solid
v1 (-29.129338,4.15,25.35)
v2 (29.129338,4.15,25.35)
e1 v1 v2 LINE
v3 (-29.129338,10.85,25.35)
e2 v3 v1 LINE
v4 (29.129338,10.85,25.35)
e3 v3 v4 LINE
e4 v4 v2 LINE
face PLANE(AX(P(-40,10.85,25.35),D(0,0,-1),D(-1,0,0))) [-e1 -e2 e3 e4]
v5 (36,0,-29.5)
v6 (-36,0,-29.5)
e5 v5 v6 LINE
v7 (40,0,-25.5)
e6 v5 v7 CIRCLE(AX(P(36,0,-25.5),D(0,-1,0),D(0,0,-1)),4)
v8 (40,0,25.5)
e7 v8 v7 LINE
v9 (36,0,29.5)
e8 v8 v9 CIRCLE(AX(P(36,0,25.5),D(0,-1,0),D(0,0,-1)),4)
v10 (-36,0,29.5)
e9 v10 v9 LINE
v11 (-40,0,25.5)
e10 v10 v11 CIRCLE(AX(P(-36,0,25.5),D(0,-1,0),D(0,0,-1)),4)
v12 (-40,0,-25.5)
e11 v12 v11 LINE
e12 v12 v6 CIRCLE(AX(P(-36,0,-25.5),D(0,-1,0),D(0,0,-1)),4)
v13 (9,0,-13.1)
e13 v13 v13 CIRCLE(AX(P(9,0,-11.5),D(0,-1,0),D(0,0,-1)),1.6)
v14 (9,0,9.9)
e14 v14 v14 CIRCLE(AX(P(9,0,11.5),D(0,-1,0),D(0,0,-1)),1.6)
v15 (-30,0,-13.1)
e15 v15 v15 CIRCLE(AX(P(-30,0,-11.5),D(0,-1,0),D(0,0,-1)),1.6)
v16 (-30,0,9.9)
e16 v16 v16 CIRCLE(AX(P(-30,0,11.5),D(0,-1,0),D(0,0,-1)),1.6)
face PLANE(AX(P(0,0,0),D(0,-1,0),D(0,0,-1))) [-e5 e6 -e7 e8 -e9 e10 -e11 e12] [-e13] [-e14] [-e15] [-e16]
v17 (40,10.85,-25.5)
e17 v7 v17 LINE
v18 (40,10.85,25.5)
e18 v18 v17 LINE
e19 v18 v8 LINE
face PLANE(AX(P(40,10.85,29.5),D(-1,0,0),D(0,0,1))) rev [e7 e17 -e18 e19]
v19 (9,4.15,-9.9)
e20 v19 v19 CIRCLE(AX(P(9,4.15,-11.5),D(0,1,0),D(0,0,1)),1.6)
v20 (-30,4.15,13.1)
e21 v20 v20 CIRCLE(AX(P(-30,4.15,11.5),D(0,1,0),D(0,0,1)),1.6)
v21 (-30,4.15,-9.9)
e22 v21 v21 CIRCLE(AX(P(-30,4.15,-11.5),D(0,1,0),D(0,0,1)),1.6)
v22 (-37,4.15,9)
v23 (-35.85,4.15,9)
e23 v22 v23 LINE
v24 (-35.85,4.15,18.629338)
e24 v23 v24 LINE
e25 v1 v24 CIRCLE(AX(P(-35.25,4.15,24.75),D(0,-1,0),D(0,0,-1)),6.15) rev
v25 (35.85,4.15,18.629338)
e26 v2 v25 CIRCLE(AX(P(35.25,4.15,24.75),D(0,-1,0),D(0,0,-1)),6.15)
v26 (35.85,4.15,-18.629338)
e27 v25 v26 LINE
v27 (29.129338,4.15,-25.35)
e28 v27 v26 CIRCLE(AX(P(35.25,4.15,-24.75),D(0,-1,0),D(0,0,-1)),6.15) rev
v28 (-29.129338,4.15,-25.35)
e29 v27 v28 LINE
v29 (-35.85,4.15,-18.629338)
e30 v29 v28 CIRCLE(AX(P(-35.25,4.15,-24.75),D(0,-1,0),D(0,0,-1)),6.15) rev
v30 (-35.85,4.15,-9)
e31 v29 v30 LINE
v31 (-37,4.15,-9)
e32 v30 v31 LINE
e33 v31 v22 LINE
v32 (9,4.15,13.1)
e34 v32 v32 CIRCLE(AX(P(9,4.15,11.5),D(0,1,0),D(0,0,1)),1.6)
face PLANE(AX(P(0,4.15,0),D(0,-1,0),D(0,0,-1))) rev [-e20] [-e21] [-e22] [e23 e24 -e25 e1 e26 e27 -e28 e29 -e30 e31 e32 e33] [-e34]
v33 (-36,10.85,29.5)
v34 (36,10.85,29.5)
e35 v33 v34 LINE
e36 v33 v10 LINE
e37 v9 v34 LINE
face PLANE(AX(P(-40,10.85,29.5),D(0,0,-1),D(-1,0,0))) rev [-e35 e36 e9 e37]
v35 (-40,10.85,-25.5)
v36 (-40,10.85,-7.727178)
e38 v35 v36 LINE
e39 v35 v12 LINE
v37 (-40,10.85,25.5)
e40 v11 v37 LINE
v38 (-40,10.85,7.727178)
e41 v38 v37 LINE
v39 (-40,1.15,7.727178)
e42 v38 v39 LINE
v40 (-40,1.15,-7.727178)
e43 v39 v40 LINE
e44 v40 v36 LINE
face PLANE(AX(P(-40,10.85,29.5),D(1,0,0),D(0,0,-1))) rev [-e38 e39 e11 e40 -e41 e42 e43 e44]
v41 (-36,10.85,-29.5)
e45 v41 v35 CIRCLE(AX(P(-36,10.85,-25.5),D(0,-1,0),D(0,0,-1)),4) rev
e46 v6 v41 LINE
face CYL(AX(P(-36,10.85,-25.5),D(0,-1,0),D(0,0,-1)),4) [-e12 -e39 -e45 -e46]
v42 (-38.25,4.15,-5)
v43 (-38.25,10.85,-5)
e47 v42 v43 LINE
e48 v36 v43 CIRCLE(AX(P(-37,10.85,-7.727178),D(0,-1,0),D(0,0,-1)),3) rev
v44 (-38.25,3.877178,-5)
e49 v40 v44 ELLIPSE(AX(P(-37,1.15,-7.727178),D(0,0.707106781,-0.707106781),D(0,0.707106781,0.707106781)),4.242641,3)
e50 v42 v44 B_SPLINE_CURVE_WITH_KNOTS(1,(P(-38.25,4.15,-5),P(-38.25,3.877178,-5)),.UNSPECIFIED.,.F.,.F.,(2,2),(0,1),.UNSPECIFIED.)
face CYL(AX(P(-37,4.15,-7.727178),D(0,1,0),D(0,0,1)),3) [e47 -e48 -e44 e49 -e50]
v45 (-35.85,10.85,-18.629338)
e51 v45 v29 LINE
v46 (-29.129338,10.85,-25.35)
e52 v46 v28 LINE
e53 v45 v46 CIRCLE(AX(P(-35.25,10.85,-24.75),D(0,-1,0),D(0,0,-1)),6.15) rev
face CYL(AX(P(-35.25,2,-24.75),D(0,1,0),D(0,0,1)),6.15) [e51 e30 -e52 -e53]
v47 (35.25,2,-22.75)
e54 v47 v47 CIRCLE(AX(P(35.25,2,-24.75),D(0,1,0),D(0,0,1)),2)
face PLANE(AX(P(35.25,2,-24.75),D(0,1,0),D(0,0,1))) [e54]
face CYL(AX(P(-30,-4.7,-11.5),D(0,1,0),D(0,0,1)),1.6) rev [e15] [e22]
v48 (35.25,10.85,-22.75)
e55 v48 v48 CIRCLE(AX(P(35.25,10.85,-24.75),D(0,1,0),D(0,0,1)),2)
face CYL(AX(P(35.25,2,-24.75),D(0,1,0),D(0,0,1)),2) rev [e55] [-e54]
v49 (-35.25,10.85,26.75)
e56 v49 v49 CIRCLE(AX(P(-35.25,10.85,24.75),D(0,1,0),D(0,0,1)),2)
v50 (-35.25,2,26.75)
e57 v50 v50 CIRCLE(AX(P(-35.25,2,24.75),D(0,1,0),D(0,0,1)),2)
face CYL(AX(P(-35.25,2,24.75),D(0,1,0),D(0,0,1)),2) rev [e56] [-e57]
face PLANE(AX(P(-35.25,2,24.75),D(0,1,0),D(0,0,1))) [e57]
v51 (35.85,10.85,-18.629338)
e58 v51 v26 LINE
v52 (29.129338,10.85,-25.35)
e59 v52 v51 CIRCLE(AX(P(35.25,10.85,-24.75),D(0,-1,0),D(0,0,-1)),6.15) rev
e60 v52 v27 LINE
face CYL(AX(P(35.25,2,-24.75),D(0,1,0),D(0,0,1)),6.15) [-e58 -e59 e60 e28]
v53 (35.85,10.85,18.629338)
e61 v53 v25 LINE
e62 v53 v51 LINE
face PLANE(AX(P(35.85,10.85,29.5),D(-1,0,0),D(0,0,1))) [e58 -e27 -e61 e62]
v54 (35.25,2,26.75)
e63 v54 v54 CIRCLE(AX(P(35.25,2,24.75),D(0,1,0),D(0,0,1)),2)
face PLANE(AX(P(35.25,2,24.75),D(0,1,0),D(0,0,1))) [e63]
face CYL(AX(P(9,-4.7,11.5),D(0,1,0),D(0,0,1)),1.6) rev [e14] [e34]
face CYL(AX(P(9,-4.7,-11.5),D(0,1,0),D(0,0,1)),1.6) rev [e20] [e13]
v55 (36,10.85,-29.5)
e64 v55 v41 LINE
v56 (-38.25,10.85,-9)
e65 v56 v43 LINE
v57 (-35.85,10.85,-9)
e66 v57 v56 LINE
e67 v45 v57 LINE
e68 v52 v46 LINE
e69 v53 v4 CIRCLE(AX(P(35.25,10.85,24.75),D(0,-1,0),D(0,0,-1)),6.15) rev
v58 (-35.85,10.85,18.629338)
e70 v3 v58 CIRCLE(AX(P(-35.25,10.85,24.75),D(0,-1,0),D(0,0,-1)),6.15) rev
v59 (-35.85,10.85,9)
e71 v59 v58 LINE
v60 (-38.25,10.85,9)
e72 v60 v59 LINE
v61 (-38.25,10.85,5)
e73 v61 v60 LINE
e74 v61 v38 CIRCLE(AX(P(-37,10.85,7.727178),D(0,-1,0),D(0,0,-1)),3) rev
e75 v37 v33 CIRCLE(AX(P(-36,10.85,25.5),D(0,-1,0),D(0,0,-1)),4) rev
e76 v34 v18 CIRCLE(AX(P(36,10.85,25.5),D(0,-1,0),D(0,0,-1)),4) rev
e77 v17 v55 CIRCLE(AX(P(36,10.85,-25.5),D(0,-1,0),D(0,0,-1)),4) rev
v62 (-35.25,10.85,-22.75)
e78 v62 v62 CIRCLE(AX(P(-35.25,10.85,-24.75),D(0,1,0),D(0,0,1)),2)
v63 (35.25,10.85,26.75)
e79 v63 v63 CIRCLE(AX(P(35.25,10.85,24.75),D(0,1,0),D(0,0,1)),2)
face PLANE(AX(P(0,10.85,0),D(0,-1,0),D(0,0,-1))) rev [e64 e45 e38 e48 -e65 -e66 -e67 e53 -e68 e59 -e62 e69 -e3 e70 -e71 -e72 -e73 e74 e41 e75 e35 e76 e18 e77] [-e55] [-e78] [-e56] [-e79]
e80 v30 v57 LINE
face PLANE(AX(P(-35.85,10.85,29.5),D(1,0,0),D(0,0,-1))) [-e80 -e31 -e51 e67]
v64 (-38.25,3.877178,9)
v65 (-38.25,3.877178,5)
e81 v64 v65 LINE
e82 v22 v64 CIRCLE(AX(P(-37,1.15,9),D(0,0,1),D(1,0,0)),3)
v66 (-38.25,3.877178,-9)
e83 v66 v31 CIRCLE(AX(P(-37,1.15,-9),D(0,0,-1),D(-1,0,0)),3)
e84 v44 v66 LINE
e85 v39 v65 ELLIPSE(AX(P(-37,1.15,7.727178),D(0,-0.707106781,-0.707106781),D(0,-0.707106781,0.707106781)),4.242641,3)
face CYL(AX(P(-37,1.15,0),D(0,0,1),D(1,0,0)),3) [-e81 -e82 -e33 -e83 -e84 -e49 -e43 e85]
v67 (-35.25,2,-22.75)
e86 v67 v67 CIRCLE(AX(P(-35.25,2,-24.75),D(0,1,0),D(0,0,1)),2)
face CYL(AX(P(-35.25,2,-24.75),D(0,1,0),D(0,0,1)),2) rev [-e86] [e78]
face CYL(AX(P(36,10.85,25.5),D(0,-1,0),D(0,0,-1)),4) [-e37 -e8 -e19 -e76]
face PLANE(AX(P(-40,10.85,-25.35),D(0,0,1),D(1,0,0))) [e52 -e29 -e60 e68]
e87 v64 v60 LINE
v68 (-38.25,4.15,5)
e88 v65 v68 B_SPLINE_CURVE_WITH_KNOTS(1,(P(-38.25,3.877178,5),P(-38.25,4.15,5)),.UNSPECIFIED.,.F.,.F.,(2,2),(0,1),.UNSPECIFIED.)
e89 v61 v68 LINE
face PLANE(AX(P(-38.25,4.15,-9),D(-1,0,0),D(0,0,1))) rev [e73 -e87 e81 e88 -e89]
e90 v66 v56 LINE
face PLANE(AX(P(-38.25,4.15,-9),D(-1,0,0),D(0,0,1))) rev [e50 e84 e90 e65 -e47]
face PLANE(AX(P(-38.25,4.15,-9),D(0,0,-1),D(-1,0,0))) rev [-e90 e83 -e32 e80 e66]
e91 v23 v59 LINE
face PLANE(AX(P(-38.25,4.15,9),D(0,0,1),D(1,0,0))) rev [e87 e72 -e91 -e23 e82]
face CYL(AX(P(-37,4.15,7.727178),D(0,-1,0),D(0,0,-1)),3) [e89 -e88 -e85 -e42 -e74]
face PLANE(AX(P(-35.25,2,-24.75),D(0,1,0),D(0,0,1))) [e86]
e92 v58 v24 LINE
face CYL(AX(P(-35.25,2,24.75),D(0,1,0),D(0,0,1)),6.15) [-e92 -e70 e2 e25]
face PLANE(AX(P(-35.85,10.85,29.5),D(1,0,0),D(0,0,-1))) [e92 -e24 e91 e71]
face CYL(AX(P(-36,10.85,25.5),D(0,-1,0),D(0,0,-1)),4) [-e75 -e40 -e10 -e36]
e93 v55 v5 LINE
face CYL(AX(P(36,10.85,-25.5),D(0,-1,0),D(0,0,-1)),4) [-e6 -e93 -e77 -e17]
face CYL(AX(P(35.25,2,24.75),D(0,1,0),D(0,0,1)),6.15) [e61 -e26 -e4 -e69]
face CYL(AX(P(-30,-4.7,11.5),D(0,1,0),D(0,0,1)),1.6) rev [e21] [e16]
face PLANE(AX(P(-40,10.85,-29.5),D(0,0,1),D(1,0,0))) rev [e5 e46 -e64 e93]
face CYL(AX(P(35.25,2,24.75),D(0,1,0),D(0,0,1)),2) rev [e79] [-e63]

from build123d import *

# Parameters (mm, degrees)
SKETCH1_W           = 80
SKETCH1_H           = 59
BOSS_EXTRUDE1_DEPTH = 10.85
SKETCH2_R           = 2
CUT_EXTRUDE1_DEPTH  = 8.85
SHELL3_START        = 4.15
SHELL3_DEPTH        = 6.7
SKETCH3_R           = 1.6
CUT_EXTRUDE2_DEPTH  = 8.85
SKETCH4_W           = 10
SKETCH4_H           = 6.7
CUT_EXTRUDE3_DEPTH  = 8.85
SKETCH5_W           = 2.4
SKETCH5_H           = 18
CUT_EXTRUDE4_DEPTH  = 6.7
FILLET1_R           = 4
FILLET2_R           = 3


# Read off the part's stored shape, not the designer's step: Shell3
with BuildPart() as part:
    # Sketch1 → Boss-Extrude1 (new body)
    with BuildSketch(Plane(origin=(0, 0, 0), x_dir=(1, 0, 0), z_dir=(0, 1, 0))):
        Rectangle(SKETCH1_W, SKETCH1_H)
    extrude(amount=BOSS_EXTRUDE1_DEPTH)

    # Sketch2 → Cut-Extrude1 (cut)
    with BuildSketch(Plane(origin=(0, 10.85, 0), x_dir=(1, 0, 0), z_dir=(0, 1, 0))):
        with Locations(Location((-35.25, 24.75, 0), (0, 0, 270))):
            Circle(SKETCH2_R)
        with Locations(Location((-35.25, -24.75, 0), (0, 0, 270))):
            Circle(SKETCH2_R)
        with Locations(Location((35.25, 24.75, 0), (0, 0, 270))):
            Circle(SKETCH2_R)
        with Locations(Location((35.25, -24.75, 0), (0, 0, 270))):
            Circle(SKETCH2_R)
    extrude(amount=-CUT_EXTRUDE1_DEPTH, mode=Mode.SUBTRACT)

    # Shell3 outline → Shell3 (cut)
    with BuildSketch(Plane(origin=(0, 0, 0), x_dir=(1, 0, 0), z_dir=(0, 1, 0)).offset(SHELL3_START)):
        with BuildLine():
            ThreePointArc((-35.85, -18.629338271), (-30.901293296, -20.401293296), (-29.129338271, -25.35))
            Line((-29.129338271, -25.35), (29.129338271, -25.35))
            ThreePointArc((29.129338271, -25.35), (30.901293296, -20.401293296), (35.85, -18.629338271))
            Line((35.85, -18.629338271), (35.85, 18.629338271))
            ThreePointArc((35.85, 18.629338271), (30.901293296, 20.401293296), (29.129338271, 25.35))
            Line((29.129338271, 25.35), (-29.129338271, 25.35))
            ThreePointArc((-29.129338271, 25.35), (-30.901293296, 20.401293296), (-35.85, 18.629338271))
            Line((-35.85, 18.629338271), (-35.85, -18.629338271))
        make_face()
    extrude(amount=SHELL3_DEPTH, mode=Mode.SUBTRACT)

    # Sketch3 → Cut-Extrude2 (cut)
    with BuildSketch(Plane(origin=(0, 4.15, 0), x_dir=(1, 0, 0), z_dir=(0, 1, 0))):
        with Locations(Location((-30, -11.5, 0), (0, 0, 270))):
            Circle(SKETCH3_R)
        with Locations(Location((9, -11.5, 0), (0, 0, 270))):
            Circle(SKETCH3_R)
        with Locations(Location((9, 11.5, 0), (0, 0, 270))):
            Circle(SKETCH3_R)
        with Locations(Location((-30, 11.5, 0), (0, 0, 270))):
            Circle(SKETCH3_R)
    extrude(amount=-CUT_EXTRUDE2_DEPTH, mode=Mode.SUBTRACT)

    # Sketch4 → Cut-Extrude3 (cut)
    with BuildSketch(Plane.ZY.offset(40)):
        with Locations((0, 7.5)):
            Rectangle(SKETCH4_W, SKETCH4_H)
    extrude(amount=-CUT_EXTRUDE3_DEPTH, mode=Mode.SUBTRACT)

    # Sketch5 → Cut-Extrude4 (cut)
    with BuildSketch(Plane(origin=(0, 10.85, 0), x_dir=(1, 0, 0), z_dir=(0, 1, 0))):
        with Locations((-37.05, 0)):
            Rectangle(SKETCH5_W, SKETCH5_H)
    extrude(amount=-CUT_EXTRUDE4_DEPTH, mode=Mode.SUBTRACT)

    # Fillet1
    fillet1_edges = [part.edges().sort_by_distance(p)[0] for p in [
        (40, 5.425, 29.5),
        (-40, 5.425, 29.5),
        (-40, 5.425, -29.5),
        (40, 5.425, -29.5),
    ]]
    fillet(fillet1_edges, radius=FILLET1_R)

    # Fillet2
    # the kernel refuses this fillet: 3 mm, written as the material it takes off along each edge
    with BuildSketch(Plane(origin=(-40, 17.667945072, -5), x_dir=(0, 0, -1), z_dir=(0, -1, 0)), Plane(origin=(-40, 4.15, 5), x_dir=(0, 0, 1), z_dir=(0, 1, 0))) as fillet2_piece_1:
        with BuildLine():
            CenterArc((2.727178029, 3), FILLET2_R, 204.624318352, 65.375681648)
            Line((0, 1.75), (-0.054543561, 1.725))
            ThreePointArc((-0.054543561, 1.725), (-0.06, 0.875), (-0.06, 0))
            Line((-0.06, 0), (0, -0.06))
            Line((0, -0.06), (2.727178029, -0.06))
            Line((2.727178029, -0.06), (2.727178029, 0))
        make_face()
    extrude(amount=13.517945072, mode=Mode.SUBTRACT)
    with BuildSketch(Plane(origin=(-40, 4.15, -12.5), x_dir=(0, -1, 0), z_dir=(0, 0, 1))) as fillet2_piece_2_section:
        with BuildLine():
            CenterArc((FILLET2_R, FILLET2_R), FILLET2_R, 180, 90)
            Line((0, FILLET2_R), (-FILLET2_R * 0.02, FILLET2_R))
            Line((-FILLET2_R * 0.02, FILLET2_R), (-FILLET2_R * 0.02, -FILLET2_R * 0.02))
            Line((-FILLET2_R * 0.02, -FILLET2_R * 0.02), (FILLET2_R, -FILLET2_R * 0.02))
            Line((FILLET2_R, -FILLET2_R * 0.02), (FILLET2_R, 0))
        make_face()
    fillet2_piece_2 = extrude(amount=17.5, mode=Mode.PRIVATE)
    fillet2_piece_2 = split(fillet2_piece_2, bisect_by=Plane(origin=(-37.813587666, 4.113532684, -5), z_dir=(0, 0, -1)), keep=Keep.TOP, mode=Mode.PRIVATE)
    fillet2_piece_2 = split(fillet2_piece_2, bisect_by=Plane(origin=(-38.25, 4.113532684, -7), z_dir=(1, 0, 0)), keep=Keep.TOP, mode=Mode.PRIVATE)
    fillet2_piece_2 = split(fillet2_piece_2, bisect_by=Plane(origin=(-37.813587666, 4.113532684, -9), z_dir=(0, 0, 1)), keep=Keep.TOP, mode=Mode.PRIVATE)
    add(fillet2_piece_2, mode=Mode.SUBTRACT)
    with BuildSketch(Plane(origin=(-40, 4.15, -5), x_dir=(0, -1, 0), z_dir=(0, 0, 1))) as fillet2_piece_3_section:
        with BuildLine():
            CenterArc((FILLET2_R, FILLET2_R), FILLET2_R, 180, 90)
            Line((0, FILLET2_R), (-FILLET2_R * 0.02, FILLET2_R))
            Line((-FILLET2_R * 0.02, FILLET2_R), (-FILLET2_R * 0.02, -FILLET2_R * 0.02))
            Line((-FILLET2_R * 0.02, -FILLET2_R * 0.02), (FILLET2_R, -FILLET2_R * 0.02))
            Line((FILLET2_R, -FILLET2_R * 0.02), (FILLET2_R, 0))
        make_face()
    fillet2_piece_3 = extrude(amount=10, mode=Mode.PRIVATE)
    fillet2_piece_3 = split(fillet2_piece_3, bisect_by=Plane(origin=(-38.25, 3.413957666, 0), z_dir=(-1, 0, 0)), keep=Keep.TOP, mode=Mode.PRIVATE)
    add(fillet2_piece_3, mode=Mode.SUBTRACT)
    with BuildSketch(Plane(origin=(-40, 4.15, -5), x_dir=(0, -1, 0), z_dir=(0, 0, 1))) as fillet2_piece_4_section:
        with BuildLine():
            CenterArc((FILLET2_R, FILLET2_R), FILLET2_R, 180, 90)
            Line((0, FILLET2_R), (-FILLET2_R * 0.02, FILLET2_R))
            Line((-FILLET2_R * 0.02, FILLET2_R), (-FILLET2_R * 0.02, -FILLET2_R * 0.02))
            Line((-FILLET2_R * 0.02, -FILLET2_R * 0.02), (FILLET2_R, -FILLET2_R * 0.02))
            Line((FILLET2_R, -FILLET2_R * 0.02), (FILLET2_R, 0))
        make_face()
    fillet2_piece_4 = extrude(amount=10, mode=Mode.PRIVATE)
    fillet2_piece_4 = split(fillet2_piece_4, bisect_by=Plane(origin=(-38.25, 4.113532684, 0), z_dir=(1, 0, 0)), keep=Keep.TOP, mode=Mode.PRIVATE)
    add(fillet2_piece_4, mode=Mode.SUBTRACT)
    with BuildSketch(Plane(origin=(-40, 4.15, -5), x_dir=(0, -1, 0), z_dir=(0, 0, 1))) as fillet2_piece_5_section:
        with BuildLine():
            CenterArc((FILLET2_R, FILLET2_R), FILLET2_R, 180, 90)
            Line((0, FILLET2_R), (-FILLET2_R * 0.02, FILLET2_R))
            Line((-FILLET2_R * 0.02, FILLET2_R), (-FILLET2_R * 0.02, -FILLET2_R * 0.02))
            Line((-FILLET2_R * 0.02, -FILLET2_R * 0.02), (FILLET2_R, -FILLET2_R * 0.02))
            Line((FILLET2_R, -FILLET2_R * 0.02), (FILLET2_R, 0))
        make_face()
    fillet2_piece_5 = extrude(amount=17.5, mode=Mode.PRIVATE)
    fillet2_piece_5 = split(fillet2_piece_5, bisect_by=Plane(origin=(-38.25, 4.113532684, 7), z_dir=(1, 0, 0)), keep=Keep.TOP, mode=Mode.PRIVATE)
    fillet2_piece_5 = split(fillet2_piece_5, bisect_by=Plane(origin=(-37.813587666, 4.113532684, 5), z_dir=(0, 0, 1)), keep=Keep.TOP, mode=Mode.PRIVATE)
    fillet2_piece_5 = split(fillet2_piece_5, bisect_by=Plane(origin=(-37.813587666, 4.113532684, 9), z_dir=(0, 0, -1)), keep=Keep.TOP, mode=Mode.PRIVATE)
    add(fillet2_piece_5, mode=Mode.SUBTRACT)
    with BuildSketch(Plane(origin=(-40, 17.667945072, -5), x_dir=(0, 0, -1), z_dir=(0, -1, 0))) as fillet2_piece_6a_section:
        with BuildLine():
            CenterArc((2.727178029, 3), FILLET2_R, 204.624318352, 65.375681648)
            Line((0, 1.75), (-0.054543561, 1.725))
            ThreePointArc((-0.054543561, 1.725), (-0.06, 0.875), (-0.06, 0))
            Line((-0.06, 0), (0, -0.06))
            Line((0, -0.06), (2.727178029, -0.06))
            Line((2.727178029, -0.06), (2.727178029, 0))
        make_face()
    fillet2_piece_6a = extrude(amount=20.335890143, mode=Mode.PRIVATE)
    fillet2_piece_6a = split(fillet2_piece_6a, bisect_by=Plane(origin=(-39.546962739, 4.15, -5.666780032), z_dir=(0, -1, 0)), keep=Keep.TOP, mode=Mode.PRIVATE)
    with BuildSketch(Plane(origin=(-40, 4.15, -12.5), x_dir=(0, -1, 0), z_dir=(0, 0, 1))) as fillet2_piece_6b_section:
        with BuildLine():
            CenterArc((FILLET2_R, FILLET2_R), FILLET2_R, 180, 90)
            Line((0, FILLET2_R), (-FILLET2_R * 0.02, FILLET2_R))
            Line((-FILLET2_R * 0.02, FILLET2_R), (-FILLET2_R * 0.02, -FILLET2_R * 0.02))
            Line((-FILLET2_R * 0.02, -FILLET2_R * 0.02), (FILLET2_R, -FILLET2_R * 0.02))
            Line((FILLET2_R, -FILLET2_R * 0.02), (FILLET2_R, 0))
        make_face()
    fillet2_piece_6b = extrude(amount=17.5, mode=Mode.PRIVATE)
    fillet2_piece_6b = split(fillet2_piece_6b, bisect_by=Plane(origin=(-39.454149009, 3.413957666, -5), z_dir=(0, 0, -1)), keep=Keep.TOP, mode=Mode.PRIVATE)
    fillet2_piece_6b = split(fillet2_piece_6b, bisect_by=Plane(origin=(-38.25, 3.413957666, -7), z_dir=(-1, 0, 0)), keep=Keep.TOP, mode=Mode.PRIVATE)
    fillet2_piece_6b = split(fillet2_piece_6b, bisect_by=Plane(origin=(-39.454149009, 3.413957666, -9), z_dir=(0, 0, 1)), keep=Keep.TOP, mode=Mode.PRIVATE)
    fillet2_piece_6 = fillet2_piece_6a & fillet2_piece_6b
    add(fillet2_piece_6, mode=Mode.SUBTRACT)
    with BuildSketch(Plane(origin=(-40, -2.667945072, 5), x_dir=(0, 0, 1), z_dir=(0, 1, 0))) as fillet2_piece_7a_section:
        with BuildLine():
            CenterArc((2.727178029, 3), FILLET2_R, 204.624318352, 65.375681648)
            Line((0, 1.75), (-0.054543561, 1.725))
            ThreePointArc((-0.054543561, 1.725), (-0.06, 0.875), (-0.06, 0))
            Line((-0.06, 0), (0, -0.06))
            Line((0, -0.06), (2.727178029, -0.06))
            Line((2.727178029, -0.06), (2.727178029, 0))
        make_face()
    fillet2_piece_7a = extrude(amount=20.335890143, mode=Mode.PRIVATE)
    fillet2_piece_7a = split(fillet2_piece_7a, bisect_by=Plane(origin=(-39.546962739, 4.15, 5.666780032), z_dir=(0, -1, 0)), keep=Keep.TOP, mode=Mode.PRIVATE)
    with BuildSketch(Plane(origin=(-40, 4.15, -5), x_dir=(0, -1, 0), z_dir=(0, 0, 1))) as fillet2_piece_7b_section:
        with BuildLine():
            CenterArc((FILLET2_R, FILLET2_R), FILLET2_R, 180, 90)
            Line((0, FILLET2_R), (-FILLET2_R * 0.02, FILLET2_R))
            Line((-FILLET2_R * 0.02, FILLET2_R), (-FILLET2_R * 0.02, -FILLET2_R * 0.02))
            Line((-FILLET2_R * 0.02, -FILLET2_R * 0.02), (FILLET2_R, -FILLET2_R * 0.02))
            Line((FILLET2_R, -FILLET2_R * 0.02), (FILLET2_R, 0))
        make_face()
    fillet2_piece_7b = extrude(amount=17.5, mode=Mode.PRIVATE)
    fillet2_piece_7b = split(fillet2_piece_7b, bisect_by=Plane(origin=(-38.25, 3.413957666, 7), z_dir=(-1, 0, 0)), keep=Keep.TOP, mode=Mode.PRIVATE)
    fillet2_piece_7b = split(fillet2_piece_7b, bisect_by=Plane(origin=(-39.454149009, 3.413957666, 5), z_dir=(0, 0, 1)), keep=Keep.TOP, mode=Mode.PRIVATE)
    fillet2_piece_7b = split(fillet2_piece_7b, bisect_by=Plane(origin=(-39.454149009, 3.413957666, 9), z_dir=(0, 0, -1)), keep=Keep.TOP, mode=Mode.PRIVATE)
    fillet2_piece_7 = fillet2_piece_7a & fillet2_piece_7b
    add(fillet2_piece_7, mode=Mode.SUBTRACT)


solid = part.part
